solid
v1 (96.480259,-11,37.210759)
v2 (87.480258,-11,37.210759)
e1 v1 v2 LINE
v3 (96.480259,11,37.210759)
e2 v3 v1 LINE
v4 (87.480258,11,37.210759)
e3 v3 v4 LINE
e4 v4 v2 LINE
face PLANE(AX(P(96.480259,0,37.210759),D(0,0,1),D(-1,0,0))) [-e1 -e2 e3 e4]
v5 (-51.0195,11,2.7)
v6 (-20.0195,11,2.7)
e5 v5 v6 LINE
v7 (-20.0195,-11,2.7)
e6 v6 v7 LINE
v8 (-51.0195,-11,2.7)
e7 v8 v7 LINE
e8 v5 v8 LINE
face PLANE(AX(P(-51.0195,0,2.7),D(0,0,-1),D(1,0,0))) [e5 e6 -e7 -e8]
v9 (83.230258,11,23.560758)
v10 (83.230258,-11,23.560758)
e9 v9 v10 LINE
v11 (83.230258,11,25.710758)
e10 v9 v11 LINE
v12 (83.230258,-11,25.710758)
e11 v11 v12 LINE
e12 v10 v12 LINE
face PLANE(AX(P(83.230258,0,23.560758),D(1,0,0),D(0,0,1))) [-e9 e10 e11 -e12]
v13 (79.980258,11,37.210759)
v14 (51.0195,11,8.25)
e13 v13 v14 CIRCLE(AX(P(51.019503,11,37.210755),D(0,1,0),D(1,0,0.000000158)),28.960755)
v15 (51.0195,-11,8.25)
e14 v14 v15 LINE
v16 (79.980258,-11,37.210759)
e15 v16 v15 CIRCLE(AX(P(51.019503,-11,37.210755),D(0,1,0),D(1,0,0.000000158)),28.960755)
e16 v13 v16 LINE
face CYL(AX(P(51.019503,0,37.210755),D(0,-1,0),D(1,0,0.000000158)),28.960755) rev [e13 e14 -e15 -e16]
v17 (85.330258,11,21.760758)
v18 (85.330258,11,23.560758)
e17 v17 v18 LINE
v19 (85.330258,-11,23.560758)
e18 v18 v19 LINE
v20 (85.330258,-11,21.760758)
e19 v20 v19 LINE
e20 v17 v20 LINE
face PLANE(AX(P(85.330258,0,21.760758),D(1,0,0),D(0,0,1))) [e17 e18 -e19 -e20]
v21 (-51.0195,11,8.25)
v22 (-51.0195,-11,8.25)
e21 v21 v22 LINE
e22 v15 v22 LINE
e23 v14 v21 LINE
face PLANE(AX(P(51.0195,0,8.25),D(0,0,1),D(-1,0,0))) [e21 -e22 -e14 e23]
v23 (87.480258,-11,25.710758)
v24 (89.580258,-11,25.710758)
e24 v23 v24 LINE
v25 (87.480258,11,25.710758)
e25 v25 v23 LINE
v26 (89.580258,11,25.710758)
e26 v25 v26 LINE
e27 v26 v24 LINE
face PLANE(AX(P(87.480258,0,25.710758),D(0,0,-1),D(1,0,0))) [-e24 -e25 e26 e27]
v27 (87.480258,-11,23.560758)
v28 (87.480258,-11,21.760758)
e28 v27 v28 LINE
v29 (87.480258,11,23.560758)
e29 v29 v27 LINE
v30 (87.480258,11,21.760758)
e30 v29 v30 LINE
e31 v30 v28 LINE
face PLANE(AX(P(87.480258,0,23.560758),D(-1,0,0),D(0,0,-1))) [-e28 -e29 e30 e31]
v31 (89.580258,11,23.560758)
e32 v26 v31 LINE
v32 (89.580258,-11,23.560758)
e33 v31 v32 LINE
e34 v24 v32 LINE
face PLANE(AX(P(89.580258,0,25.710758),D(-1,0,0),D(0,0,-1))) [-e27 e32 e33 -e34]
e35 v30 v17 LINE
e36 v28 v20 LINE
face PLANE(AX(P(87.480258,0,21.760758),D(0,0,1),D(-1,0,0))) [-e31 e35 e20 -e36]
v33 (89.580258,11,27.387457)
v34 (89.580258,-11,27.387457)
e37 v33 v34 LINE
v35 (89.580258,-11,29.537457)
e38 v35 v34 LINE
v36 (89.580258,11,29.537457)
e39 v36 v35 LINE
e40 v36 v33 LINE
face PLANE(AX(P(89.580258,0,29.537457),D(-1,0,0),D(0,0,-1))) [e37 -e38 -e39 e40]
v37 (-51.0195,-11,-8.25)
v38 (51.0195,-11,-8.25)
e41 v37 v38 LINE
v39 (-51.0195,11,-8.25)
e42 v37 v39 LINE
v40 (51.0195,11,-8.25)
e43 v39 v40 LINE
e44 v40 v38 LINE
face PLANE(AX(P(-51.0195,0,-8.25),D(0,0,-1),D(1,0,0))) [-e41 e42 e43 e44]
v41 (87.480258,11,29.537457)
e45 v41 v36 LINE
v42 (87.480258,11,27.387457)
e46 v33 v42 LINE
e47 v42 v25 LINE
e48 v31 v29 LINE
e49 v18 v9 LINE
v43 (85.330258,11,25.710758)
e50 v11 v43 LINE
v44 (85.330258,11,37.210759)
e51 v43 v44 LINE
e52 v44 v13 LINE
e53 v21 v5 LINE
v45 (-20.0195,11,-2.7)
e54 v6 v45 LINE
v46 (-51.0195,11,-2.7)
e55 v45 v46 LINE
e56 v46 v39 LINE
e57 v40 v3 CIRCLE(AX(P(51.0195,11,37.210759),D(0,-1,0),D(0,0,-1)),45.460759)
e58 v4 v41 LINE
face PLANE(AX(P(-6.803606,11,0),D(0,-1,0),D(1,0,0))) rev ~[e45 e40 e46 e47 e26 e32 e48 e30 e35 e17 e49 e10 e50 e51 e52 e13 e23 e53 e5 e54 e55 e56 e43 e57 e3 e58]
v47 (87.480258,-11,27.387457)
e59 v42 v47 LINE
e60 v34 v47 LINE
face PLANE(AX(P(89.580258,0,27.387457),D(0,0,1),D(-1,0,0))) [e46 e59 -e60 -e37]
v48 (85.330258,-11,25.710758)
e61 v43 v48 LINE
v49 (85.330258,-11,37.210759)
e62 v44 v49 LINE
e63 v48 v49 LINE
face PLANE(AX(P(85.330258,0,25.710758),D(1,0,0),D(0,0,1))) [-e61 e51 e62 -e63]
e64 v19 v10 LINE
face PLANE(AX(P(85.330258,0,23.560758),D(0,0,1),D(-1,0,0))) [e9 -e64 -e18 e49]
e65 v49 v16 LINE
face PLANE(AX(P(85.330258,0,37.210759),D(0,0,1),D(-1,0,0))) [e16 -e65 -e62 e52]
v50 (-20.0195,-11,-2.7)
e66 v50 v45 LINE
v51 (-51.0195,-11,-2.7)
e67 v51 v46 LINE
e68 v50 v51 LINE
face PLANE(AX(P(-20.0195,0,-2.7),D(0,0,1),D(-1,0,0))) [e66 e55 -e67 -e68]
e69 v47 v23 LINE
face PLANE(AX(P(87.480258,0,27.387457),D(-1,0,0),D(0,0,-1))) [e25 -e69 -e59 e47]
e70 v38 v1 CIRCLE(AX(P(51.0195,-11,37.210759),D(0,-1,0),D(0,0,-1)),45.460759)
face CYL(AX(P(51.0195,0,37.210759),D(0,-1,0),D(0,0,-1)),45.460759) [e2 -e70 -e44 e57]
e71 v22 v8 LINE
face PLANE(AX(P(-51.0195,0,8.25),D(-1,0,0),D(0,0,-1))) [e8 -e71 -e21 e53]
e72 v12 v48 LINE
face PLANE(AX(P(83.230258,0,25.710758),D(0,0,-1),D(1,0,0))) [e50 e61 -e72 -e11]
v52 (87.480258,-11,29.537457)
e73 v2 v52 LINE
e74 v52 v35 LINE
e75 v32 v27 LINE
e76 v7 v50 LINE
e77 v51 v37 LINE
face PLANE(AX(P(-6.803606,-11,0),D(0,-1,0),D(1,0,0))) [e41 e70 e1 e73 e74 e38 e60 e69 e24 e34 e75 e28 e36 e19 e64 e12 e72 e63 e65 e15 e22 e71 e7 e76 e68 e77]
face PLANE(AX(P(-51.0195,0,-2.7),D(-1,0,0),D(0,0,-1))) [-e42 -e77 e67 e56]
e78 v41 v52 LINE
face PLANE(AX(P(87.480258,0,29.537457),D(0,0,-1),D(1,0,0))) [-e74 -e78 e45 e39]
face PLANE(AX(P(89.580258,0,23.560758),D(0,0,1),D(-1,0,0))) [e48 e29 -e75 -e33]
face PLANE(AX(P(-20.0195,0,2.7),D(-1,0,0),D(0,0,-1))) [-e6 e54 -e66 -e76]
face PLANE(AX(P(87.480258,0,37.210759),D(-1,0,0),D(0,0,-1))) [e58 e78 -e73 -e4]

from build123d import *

# Parameters (mm, degrees)
F1_DEPTH = 11


# Not quite as in the source:
# - ends of sketch curves that miss each other by under 0.0002 mm in the source are joined
# - a feature names something its author has since deleted; it is built from what else it names


with BuildPart() as f1:
    # F0 (on Front) → F1 (new body, symmetric)
    with BuildSketch(Plane.XZ):
        Polygon((-51.0195, -8.25), (51.0195, -8.25), (51.0195, 8.25), (-51.0195, 8.25), (-51.0195, 2.7), (-20.0195, 2.7), (-20.0195, -2.7), (-51.0195, -2.7), align=None)
        with BuildLine():
            Line((51.0195, 8.25), (51.0195, -8.25))
            ThreePointArc((51.0195, -8.25), (83.1651110764, 5.0651480786), (96.4802591551, 37.2107591551))
            Line((96.4802591551, 37.2107591551), (87.4802576721, 37.2107591551))
            Line((87.4802576721, 37.2107591551), (87.4802576721, 29.5374569684))
            Line((87.4802576721, 29.5374569684), (89.5802576721, 29.5374569684))
            Line((89.5802576721, 29.5374569684), (89.5802576721, 27.3874569684))
            Line((89.5802576721, 27.3874569684), (87.4802576721, 27.3874569684))
            Line((87.4802576721, 27.3874569684), (87.4802576721, 25.7107576162))
            Line((87.4802576721, 25.7107576162), (89.5802576721, 25.7107576162))
            Line((89.5802576721, 25.7107576162), (89.5802576721, 23.5607576162))
            Line((89.5802576721, 23.5607576162), (87.4802576721, 23.5607576162))
            Line((87.4802576721, 23.5607576162), (87.4802576721, 21.7607576162))
            Line((87.4802576721, 21.7607576162), (85.3302576721, 21.7607576162))
            Line((85.3302576721, 21.7607576162), (85.3302576721, 23.5607576162))
            Line((85.3302576721, 23.5607576162), (83.2302576721, 23.5607576162))
            Line((83.2302576721, 23.5607576162), (83.2302576721, 25.7107576162))
            Line((83.2302576721, 25.7107576162), (85.3302576721, 25.7107576162))
            Line((85.3302576721, 25.7107576162), (85.3302576721, 37.2107591551))
            Line((85.3302576721, 37.2107591551), (79.9802576721, 37.2107591551))
            ThreePointArc((79.9802576721, 37.2107591551), (71.4978497843, 16.7324093708), (51.0195, 8.25))
        make_face()
    extrude(amount=F1_DEPTH, both=True)


solid = f1.part
